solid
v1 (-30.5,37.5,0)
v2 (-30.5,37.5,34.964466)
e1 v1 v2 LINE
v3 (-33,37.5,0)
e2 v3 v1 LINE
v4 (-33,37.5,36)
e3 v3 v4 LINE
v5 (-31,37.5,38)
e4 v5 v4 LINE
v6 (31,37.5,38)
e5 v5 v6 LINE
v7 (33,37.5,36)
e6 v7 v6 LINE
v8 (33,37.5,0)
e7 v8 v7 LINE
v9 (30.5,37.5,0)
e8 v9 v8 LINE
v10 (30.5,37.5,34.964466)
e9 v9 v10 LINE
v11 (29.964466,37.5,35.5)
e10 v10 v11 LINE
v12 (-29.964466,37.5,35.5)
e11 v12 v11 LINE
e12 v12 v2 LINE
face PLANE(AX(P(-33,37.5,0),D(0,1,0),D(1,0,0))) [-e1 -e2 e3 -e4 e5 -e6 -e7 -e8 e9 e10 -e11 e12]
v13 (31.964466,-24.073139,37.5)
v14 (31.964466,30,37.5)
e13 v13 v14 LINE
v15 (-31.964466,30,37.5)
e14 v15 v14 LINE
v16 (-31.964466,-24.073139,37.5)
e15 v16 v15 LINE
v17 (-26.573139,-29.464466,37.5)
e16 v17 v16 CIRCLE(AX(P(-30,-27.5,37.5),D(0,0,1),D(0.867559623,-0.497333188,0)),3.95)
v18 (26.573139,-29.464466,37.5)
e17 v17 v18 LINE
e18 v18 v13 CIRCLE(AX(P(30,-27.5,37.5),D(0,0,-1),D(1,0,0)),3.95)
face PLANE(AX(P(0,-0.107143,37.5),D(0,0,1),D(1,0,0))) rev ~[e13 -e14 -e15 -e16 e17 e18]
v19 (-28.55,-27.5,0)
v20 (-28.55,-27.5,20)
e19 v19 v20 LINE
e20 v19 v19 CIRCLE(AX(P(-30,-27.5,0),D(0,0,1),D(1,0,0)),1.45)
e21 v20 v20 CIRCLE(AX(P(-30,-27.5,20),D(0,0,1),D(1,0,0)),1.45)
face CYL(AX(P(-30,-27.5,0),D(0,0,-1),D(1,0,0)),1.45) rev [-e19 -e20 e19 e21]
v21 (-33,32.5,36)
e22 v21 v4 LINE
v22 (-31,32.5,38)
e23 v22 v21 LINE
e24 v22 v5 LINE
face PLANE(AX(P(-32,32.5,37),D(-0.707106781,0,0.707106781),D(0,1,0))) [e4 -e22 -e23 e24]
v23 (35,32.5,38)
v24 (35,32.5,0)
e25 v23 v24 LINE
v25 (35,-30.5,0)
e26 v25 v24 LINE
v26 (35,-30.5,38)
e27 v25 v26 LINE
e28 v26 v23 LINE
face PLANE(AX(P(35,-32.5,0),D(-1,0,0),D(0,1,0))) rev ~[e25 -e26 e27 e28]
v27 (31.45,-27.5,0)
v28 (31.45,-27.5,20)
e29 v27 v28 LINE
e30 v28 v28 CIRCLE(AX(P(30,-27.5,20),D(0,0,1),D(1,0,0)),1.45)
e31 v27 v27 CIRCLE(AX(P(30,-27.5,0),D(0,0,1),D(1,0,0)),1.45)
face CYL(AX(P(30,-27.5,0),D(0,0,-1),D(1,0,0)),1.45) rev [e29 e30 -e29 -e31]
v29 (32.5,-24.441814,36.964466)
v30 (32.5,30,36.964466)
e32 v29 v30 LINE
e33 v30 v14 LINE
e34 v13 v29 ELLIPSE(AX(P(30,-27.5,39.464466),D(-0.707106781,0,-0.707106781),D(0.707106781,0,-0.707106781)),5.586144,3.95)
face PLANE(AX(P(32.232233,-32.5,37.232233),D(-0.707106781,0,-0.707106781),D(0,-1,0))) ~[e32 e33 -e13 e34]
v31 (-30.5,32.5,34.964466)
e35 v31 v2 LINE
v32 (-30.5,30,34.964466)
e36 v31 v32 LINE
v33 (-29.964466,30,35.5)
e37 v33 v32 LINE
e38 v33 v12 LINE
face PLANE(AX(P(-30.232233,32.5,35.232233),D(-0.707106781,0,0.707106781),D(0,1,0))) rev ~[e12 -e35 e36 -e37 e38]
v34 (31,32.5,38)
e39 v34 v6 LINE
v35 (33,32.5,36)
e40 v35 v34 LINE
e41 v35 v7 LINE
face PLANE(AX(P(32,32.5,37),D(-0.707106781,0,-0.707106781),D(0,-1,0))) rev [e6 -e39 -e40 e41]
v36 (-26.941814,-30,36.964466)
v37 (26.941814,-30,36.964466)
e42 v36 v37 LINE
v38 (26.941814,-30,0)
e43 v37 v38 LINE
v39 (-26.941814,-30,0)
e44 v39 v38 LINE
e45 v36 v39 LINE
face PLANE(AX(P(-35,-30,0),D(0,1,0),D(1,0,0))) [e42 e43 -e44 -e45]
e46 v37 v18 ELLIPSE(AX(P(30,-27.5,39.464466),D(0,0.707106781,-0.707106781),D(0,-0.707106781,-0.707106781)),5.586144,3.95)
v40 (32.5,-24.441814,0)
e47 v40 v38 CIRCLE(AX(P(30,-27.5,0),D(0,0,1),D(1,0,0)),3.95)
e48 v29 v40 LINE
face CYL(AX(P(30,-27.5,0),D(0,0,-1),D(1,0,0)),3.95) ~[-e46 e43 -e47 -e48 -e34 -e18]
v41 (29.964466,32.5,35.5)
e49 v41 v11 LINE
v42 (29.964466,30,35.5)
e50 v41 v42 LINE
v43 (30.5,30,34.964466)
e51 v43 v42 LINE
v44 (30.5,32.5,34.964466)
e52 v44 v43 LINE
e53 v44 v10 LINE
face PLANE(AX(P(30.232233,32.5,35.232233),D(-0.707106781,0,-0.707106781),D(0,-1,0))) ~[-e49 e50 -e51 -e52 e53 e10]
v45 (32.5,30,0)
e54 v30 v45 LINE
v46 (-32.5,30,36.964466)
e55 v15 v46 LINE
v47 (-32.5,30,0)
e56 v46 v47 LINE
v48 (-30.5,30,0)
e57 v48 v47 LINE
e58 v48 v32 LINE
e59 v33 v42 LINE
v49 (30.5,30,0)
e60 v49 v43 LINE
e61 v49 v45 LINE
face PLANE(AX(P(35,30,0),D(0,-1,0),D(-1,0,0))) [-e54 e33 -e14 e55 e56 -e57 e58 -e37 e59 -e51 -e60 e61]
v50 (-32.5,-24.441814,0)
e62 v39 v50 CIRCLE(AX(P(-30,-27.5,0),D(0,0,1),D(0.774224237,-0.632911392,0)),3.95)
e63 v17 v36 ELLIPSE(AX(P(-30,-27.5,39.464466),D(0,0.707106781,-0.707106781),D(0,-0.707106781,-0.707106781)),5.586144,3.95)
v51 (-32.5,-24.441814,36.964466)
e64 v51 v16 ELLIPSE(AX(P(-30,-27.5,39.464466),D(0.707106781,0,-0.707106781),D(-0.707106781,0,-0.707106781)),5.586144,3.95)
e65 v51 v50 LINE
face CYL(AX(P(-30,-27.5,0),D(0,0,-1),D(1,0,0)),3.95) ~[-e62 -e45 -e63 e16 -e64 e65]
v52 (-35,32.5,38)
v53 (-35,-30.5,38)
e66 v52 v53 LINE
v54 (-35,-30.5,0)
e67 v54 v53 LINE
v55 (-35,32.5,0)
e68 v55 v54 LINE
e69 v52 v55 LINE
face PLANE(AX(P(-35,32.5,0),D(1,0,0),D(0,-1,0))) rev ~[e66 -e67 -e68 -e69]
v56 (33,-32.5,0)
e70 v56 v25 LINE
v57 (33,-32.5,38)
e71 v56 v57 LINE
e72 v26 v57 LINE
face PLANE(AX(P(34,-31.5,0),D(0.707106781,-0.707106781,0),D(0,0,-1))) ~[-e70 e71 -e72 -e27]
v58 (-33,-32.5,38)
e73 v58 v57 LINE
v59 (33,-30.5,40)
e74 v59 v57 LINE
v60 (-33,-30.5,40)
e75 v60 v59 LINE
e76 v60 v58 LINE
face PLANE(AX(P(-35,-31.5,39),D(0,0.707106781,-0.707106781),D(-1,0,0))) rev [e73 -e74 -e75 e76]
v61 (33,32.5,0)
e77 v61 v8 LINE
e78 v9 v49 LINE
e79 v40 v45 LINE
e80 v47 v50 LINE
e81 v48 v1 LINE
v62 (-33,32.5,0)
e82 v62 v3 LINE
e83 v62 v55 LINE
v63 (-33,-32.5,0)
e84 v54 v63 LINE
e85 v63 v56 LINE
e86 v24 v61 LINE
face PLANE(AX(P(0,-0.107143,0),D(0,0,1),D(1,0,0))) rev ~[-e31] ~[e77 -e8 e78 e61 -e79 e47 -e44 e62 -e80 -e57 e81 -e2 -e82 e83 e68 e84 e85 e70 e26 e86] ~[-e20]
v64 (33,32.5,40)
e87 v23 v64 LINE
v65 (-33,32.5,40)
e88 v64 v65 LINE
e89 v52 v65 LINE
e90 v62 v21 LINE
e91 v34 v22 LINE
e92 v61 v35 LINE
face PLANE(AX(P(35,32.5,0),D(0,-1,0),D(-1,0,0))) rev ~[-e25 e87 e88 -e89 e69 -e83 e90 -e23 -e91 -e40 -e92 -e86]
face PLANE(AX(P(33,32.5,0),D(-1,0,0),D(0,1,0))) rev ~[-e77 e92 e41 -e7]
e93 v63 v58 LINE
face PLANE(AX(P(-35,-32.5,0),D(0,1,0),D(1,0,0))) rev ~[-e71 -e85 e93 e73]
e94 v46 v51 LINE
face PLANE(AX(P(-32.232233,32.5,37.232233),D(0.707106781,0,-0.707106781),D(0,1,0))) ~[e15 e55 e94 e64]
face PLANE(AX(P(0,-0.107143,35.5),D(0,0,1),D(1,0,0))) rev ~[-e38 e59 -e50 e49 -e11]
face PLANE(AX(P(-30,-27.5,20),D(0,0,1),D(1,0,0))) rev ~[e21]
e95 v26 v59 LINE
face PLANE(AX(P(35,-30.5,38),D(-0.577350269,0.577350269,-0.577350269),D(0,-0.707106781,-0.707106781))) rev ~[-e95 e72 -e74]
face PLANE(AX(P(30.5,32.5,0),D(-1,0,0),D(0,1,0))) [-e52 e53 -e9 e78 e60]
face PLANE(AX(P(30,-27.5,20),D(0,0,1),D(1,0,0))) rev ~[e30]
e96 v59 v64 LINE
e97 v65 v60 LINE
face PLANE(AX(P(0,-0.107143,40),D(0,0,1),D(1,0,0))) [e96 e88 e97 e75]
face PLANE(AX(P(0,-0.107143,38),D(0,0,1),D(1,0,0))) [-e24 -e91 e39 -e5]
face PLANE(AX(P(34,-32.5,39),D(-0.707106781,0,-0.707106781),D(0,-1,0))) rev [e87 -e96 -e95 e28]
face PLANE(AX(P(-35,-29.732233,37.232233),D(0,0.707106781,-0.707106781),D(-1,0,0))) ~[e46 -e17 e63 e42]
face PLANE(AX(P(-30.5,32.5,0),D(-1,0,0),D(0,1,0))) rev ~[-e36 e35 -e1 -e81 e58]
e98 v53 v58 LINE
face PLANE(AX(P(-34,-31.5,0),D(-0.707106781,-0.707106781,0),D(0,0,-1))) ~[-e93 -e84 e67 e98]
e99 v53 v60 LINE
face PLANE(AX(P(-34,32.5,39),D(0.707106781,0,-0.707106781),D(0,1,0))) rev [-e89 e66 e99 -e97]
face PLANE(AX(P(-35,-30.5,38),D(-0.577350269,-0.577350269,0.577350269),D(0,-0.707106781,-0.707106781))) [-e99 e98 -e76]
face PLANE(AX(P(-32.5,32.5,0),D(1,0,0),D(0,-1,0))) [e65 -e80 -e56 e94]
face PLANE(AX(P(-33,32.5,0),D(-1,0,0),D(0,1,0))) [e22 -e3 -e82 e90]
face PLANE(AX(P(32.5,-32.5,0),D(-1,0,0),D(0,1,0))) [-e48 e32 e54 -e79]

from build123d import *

# Parameters (mm, degrees)
F0_R        = 1.45
F0_W        = 66
F0_H        = 5
F1_DEPTH    = 40
F2_DEPTH    = 38
F3_SIZE     = 2
F4_T        = 2.5
F4_T3_DEPTH = 41
F4_T5_DEPTH = 7.8284271247
F4_T7_DEPTH = 67
F4_T9_DEPTH = 7.8284271247
F5_START    = 20
F5_DEPTH    = 20


# Not quite as in the source:
# - a shell that OpenCascade refuses in one call is made with other operations: the cavity is built on its own and cut out


with BuildPart() as f1:
    # F0 (on Top) → F1 (new body)
    with BuildSketch(Plane.XY):
        Polygon((-33, 32.5), (-35, 32.5), (-35, -32.5), (35, -32.5), (35, 32.5), (33, 32.5), (33, 27.5), (-33, 27.5), align=None)
        with Locations((-30, -27.5)):
            Circle(F0_R, mode=Mode.SUBTRACT)
        with Locations((30, -27.5)):
            Circle(F0_R, mode=Mode.SUBTRACT)
        with Locations((0, 30)):
            Rectangle(F0_W, F0_H)
    extrude(amount=F1_DEPTH)

    # F0 (on Top) → F2 (join)
    with BuildSketch(Plane.XY):
        Polygon((-33, 32.5), (-35, 32.5), (-35, -32.5), (35, -32.5), (35, 32.5), (33, 32.5), (33, 27.5), (-33, 27.5), align=None)
        with Locations((-30, -27.5)):
            Circle(F0_R, mode=Mode.SUBTRACT)
        with Locations((30, -27.5)):
            Circle(F0_R, mode=Mode.SUBTRACT)
        with Locations((0, 35)):
            Rectangle(F0_W, F0_H)
        with Locations((0, 30)):
            Rectangle(F0_W, F0_H)
    extrude(amount=F2_DEPTH)

    # F3
    f3_edges = [f1.edges().sort_by_distance(p)[0] for p in [
        (0, -32.5, 40),
        (35, 0, 40),
        (-35, 0, 40),
        (33, 35, 38),
        (-33, 35, 38),
        (-35, -32.5, 20),
        (35, -32.5, 20),
    ]]
    chamfer(f3_edges, length=F3_SIZE)

    # F4: shell of thickness 2.5, made by hand


with BuildPart() as f4_core1:
    # F4_t2: copy of F1
    add(f1.part)

    # the walls: a layer under each face that stays
    f4_faces = [f4_core1.faces().sort_by_distance(p)[0] for p in [
        (-35, 1, 19),
        (-34, -31.5, 19),
        (32.6666666667, 32.5, 38.6666666667),
        (-34, 1, 39),
        (0, -32.5, 19),
        (-33, 35, 18),
        (34, -31.5, 19),
        (35, 1, 19),
        (33, 35, 18),
        (-31.45, -27.5, 20),
        (28.55, -27.5, 20),
        (-34, -31, 38.5),
        (-32, 35, 37),
        (0, 35, 38),
        (32, 35, 37),
        (0, 1, 40),
        (34, 1, 39),
        (0, -31.5, 39),
        (34, -31, 38.5),
    ]]
    thicken(f4_faces, amount=-F4_T, mode=Mode.SUBTRACT)

    # F4_s4 → F4_t3 (cut)
    with BuildSketch(Plane.XY.offset(-2.5)):
        Polygon((-33.025, 32.525), (-33, 30), (-30.5, 30), (-30.5, 32.5), align=None)
        Polygon((33.025, 32.525), (33, 30), (30.5, 30), (30.5, 32.5), align=None)
    extrude(amount=F4_T3_DEPTH, mode=Mode.SUBTRACT)

    # F4_s6 → F4_t5 (cut)
    with BuildSketch(Plane(origin=(5.267766953, 0, 5.267766953), x_dir=(0, 1, 0), z_dir=(-0.7071067812, 0, -0.7071067812))):
        Polygon((32.525, -48.8153679019), (30, -48.7903679019), (30, -46.2903679019), (32.5, -46.2903679019), align=None)
    extrude(amount=F4_T5_DEPTH, mode=Mode.SUBTRACT)

    # F4_s8 → F4_t7 (cut)
    with BuildSketch(Plane.YZ.offset(-33.5)):
        Polygon((32.525, 38.025), (30, 38), (30, 35.5), (32.5, 35.5), align=None)
    extrude(amount=F4_T7_DEPTH, mode=Mode.SUBTRACT)

    # F4_s10 → F4_t9 (cut)
    with BuildSketch(Plane(origin=(0.267766953, 0, -0.267766953), x_dir=(0, 1, 0), z_dir=(-0.7071067812, 0, 0.7071067812))):
        Polygon((32.525, -48.8153679019), (30, -48.7903679019), (30, -46.2903679019), (32.5, -46.2903679019), align=None)
    extrude(amount=F4_T9_DEPTH, mode=Mode.SUBTRACT)


with BuildPart() as f1_1:
    add(f1.part)

    # what is left inside the walls is the cavity
    f4_cavity = [f4_core1.part.solids().sort_by_distance(p)[0] for p in [
        (0, -7.5, 0.025),
    ]]
    add(f4_cavity, mode=Mode.SUBTRACT)

    # F0 (on Top) → F5 (join)
    with BuildSketch(Plane.XY.offset(F5_START)):
        with Locations((-30, -27.5)):
            Circle(F0_R)
        with Locations((30, -27.5)):
            Circle(F0_R)
    extrude(amount=F5_DEPTH)


solid = f1_1.part
